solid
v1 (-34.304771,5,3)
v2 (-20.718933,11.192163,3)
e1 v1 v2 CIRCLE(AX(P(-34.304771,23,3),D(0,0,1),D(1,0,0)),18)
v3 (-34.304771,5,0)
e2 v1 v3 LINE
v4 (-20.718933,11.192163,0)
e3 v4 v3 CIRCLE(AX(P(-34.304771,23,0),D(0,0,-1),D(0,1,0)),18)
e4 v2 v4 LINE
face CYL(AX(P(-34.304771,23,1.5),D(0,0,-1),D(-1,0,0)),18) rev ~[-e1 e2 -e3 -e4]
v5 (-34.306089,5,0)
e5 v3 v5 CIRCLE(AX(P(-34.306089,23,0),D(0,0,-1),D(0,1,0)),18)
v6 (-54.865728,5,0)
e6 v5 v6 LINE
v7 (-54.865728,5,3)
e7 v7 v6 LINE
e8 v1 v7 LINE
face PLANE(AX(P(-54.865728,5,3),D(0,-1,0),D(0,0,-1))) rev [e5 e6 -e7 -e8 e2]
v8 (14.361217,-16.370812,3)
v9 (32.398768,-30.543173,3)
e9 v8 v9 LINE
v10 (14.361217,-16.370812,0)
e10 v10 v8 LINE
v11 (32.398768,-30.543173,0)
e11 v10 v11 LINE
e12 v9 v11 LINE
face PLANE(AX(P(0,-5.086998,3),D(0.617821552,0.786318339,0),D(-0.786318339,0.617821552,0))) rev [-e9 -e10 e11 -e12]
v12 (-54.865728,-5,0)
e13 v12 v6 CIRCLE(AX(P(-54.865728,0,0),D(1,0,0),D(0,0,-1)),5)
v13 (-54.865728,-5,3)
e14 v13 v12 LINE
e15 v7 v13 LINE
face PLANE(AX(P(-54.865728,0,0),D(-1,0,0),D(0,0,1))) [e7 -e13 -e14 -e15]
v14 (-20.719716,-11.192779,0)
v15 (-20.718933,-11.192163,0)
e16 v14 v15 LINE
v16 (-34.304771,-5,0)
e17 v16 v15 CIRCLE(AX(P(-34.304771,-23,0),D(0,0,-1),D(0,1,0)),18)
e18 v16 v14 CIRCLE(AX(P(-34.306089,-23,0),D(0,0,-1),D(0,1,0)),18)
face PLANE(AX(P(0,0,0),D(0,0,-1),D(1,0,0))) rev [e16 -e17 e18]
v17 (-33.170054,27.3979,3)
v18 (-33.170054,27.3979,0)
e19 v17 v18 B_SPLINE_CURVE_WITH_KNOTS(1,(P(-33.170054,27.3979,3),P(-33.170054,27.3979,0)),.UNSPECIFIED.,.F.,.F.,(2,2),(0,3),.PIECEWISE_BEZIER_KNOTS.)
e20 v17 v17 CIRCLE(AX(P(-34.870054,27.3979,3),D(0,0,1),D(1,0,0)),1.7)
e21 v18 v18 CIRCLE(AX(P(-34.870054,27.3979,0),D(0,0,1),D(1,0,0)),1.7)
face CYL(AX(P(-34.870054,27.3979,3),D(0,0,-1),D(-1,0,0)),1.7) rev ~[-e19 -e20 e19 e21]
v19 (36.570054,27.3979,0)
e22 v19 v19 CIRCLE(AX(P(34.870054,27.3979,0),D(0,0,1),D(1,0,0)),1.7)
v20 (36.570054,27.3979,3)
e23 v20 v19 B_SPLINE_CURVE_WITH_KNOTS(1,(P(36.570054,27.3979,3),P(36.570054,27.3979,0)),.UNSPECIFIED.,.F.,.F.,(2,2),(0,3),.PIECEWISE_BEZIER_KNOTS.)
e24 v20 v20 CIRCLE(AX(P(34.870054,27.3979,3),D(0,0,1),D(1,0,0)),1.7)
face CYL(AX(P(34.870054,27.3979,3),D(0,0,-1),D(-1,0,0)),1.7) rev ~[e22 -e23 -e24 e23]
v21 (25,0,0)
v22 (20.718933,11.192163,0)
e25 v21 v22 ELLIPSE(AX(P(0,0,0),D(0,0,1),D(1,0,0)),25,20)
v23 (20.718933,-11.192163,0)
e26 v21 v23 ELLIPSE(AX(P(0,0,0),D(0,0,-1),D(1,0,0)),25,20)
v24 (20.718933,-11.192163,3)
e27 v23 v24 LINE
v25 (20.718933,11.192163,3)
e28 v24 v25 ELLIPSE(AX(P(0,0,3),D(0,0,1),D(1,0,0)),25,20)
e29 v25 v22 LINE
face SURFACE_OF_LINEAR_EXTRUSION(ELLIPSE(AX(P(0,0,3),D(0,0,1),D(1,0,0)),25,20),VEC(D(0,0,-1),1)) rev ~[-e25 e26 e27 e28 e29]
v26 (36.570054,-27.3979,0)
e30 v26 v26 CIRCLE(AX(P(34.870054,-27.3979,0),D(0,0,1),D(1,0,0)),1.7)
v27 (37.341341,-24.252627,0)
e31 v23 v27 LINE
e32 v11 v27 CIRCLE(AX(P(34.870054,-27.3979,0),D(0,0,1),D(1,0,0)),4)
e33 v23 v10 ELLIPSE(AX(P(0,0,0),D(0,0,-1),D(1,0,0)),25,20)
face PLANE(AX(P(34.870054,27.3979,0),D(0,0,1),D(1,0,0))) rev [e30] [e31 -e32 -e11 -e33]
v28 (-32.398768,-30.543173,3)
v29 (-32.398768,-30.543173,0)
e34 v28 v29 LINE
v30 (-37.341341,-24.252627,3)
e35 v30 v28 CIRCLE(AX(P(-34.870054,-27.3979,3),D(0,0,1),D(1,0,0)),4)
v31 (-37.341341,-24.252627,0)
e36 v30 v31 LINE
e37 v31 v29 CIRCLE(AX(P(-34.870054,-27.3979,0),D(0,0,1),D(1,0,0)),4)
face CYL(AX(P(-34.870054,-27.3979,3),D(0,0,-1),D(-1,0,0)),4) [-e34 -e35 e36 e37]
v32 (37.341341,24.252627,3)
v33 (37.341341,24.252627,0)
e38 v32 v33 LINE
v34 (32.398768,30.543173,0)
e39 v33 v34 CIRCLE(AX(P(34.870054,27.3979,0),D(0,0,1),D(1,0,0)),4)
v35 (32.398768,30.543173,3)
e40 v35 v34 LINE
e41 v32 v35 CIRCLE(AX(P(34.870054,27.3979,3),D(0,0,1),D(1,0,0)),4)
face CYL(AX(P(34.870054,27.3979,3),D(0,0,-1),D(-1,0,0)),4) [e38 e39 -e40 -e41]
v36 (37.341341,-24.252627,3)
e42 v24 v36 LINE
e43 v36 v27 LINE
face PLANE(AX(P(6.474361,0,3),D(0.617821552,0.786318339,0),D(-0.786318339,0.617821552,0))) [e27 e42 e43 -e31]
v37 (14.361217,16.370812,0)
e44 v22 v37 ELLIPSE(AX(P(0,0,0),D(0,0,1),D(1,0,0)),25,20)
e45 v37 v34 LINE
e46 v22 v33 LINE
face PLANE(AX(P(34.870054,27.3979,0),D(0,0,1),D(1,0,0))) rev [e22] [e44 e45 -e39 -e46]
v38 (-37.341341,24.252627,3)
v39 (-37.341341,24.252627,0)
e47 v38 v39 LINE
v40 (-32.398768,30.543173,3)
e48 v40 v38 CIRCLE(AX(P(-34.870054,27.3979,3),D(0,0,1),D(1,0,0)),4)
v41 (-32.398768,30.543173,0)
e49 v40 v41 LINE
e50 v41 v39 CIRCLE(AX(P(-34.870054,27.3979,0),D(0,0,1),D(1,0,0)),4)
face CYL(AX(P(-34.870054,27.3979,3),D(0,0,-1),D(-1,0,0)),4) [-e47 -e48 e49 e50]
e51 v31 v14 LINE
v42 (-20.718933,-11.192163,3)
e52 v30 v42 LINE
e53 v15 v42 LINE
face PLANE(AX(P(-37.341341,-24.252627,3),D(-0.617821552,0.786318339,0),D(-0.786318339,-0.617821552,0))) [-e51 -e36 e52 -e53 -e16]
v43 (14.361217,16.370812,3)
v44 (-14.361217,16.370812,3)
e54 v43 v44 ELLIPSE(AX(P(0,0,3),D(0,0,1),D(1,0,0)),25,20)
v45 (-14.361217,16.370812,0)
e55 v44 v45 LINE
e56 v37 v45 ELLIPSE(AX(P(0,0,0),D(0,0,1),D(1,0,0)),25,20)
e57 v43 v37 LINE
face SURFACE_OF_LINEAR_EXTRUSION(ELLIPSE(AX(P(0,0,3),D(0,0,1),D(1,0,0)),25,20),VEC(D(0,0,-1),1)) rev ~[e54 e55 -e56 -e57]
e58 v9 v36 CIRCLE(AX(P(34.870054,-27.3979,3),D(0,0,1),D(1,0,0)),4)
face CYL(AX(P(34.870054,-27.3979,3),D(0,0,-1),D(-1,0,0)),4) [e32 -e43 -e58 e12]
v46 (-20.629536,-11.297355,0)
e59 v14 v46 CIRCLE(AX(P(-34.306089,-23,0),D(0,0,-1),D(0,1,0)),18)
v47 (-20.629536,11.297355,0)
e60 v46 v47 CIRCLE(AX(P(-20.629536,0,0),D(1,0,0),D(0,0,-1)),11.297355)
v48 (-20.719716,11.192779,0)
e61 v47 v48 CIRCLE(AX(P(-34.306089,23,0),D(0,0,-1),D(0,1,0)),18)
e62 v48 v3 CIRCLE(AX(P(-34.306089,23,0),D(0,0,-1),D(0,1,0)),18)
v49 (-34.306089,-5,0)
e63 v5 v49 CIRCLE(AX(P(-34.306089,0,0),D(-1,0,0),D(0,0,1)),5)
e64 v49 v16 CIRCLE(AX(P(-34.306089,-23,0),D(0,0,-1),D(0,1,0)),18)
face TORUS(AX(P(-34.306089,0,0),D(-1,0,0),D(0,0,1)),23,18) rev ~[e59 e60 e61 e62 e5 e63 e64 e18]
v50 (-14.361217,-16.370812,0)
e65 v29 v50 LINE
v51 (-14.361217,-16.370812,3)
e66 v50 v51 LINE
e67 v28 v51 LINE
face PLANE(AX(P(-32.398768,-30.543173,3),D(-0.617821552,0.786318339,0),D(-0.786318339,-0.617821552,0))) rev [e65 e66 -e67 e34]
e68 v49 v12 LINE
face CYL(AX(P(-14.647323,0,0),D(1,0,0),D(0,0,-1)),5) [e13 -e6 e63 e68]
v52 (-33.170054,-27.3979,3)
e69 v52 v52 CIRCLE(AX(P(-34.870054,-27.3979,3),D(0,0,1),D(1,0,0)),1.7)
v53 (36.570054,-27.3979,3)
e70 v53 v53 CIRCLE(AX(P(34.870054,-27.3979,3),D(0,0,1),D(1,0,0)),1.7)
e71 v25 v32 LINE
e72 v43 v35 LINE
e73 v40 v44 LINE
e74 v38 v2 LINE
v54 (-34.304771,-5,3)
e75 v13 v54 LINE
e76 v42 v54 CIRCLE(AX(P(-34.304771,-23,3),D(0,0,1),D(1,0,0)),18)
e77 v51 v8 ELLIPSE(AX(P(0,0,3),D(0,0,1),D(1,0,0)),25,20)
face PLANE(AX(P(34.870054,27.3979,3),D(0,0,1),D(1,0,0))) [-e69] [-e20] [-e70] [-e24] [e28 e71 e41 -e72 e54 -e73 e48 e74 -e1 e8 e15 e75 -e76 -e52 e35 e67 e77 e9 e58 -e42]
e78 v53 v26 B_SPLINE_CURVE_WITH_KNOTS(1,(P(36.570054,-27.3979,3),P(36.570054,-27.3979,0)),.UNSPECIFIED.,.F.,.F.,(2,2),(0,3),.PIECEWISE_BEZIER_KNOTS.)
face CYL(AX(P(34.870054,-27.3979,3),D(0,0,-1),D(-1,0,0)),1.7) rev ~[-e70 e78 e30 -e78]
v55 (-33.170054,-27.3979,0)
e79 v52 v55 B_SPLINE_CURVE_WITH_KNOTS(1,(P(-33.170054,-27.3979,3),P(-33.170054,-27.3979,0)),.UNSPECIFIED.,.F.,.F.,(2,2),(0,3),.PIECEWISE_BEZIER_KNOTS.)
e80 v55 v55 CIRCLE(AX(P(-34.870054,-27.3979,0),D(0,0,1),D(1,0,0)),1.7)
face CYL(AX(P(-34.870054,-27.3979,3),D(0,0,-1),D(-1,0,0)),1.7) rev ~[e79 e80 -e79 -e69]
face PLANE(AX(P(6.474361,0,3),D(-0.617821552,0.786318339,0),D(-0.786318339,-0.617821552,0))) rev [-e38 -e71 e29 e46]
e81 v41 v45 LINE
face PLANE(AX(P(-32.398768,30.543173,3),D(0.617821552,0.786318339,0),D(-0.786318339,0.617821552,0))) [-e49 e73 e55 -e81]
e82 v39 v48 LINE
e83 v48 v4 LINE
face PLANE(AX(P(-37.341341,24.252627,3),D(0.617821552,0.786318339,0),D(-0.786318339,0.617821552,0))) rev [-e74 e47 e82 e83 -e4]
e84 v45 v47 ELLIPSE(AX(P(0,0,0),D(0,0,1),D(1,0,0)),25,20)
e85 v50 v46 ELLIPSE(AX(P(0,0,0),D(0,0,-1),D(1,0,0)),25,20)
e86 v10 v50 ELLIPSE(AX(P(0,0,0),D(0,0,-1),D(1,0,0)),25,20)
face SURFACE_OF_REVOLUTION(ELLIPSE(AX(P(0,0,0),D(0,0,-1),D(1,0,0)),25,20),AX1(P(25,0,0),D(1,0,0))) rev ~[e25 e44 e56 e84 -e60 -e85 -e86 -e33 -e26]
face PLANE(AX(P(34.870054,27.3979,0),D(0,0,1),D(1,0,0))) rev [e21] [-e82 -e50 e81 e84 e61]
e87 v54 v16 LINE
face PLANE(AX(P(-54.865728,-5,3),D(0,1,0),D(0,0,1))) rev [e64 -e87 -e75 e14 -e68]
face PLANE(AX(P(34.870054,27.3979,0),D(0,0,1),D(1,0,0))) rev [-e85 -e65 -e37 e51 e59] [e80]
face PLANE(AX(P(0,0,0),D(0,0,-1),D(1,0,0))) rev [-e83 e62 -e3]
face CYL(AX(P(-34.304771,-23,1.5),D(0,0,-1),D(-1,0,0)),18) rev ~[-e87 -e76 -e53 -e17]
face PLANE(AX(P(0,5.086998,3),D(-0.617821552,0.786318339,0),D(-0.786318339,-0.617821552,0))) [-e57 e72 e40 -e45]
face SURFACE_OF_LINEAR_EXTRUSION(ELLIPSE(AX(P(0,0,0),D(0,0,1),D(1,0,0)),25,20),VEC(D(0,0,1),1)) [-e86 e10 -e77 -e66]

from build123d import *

# Parameters (mm, degrees)
R_VOLUTION2_ANGLE  = 180
R_VOLUTION4_START  = -54.865727699
R_VOLUTION4_DEPTH  = 30.659581785
CONG_1_R           = 18
ESQUISSE4_R        = 1.7
BOSS_EXTRU_3_DEPTH = 3
BOSS_EXTRU_4_DEPTH = 3
ESQUISSE6_RX       = 25
ESQUISSE6_RY       = 20
BOSS_EXTRU_5_DEPTH = 3
ESQUISSE8_W        = 41.684690815
ESQUISSE8_H        = 10
BOSS_EXTRU_6_DEPTH = 3
CONG_2_R           = 18
CONG_3_R           = 18


# Read off the part's stored shape, not the designer's step: Révolution4
with BuildPart() as part:
    # Esquisse1 → Révolution2 (revolve)
    with BuildSketch(Plane.XY):
        with BuildLine():
            Line((25, 0), (-25, 0))
            add(Edge.make_bspline(
                [(25, 0), (25, 20), (0, 20), (-25, 20), (-25, 0)],
                knots=[3.141592654, 3.141592654, 3.141592654, 4.71238898, 4.71238898, 6.283185307, 6.283185307, 6.283185307], degree=2, weights=[1, 0.707106781, 1, 0.707106781, 1]))
        make_face()
    revolve(axis=Axis((25, 0, 0), (-1, 0, 0)), revolution_arc=R_VOLUTION2_ANGLE)

    # Révolution4 outline → Révolution4 (add)
    with BuildSketch(Plane.YZ.offset(R_VOLUTION4_START)):
        with BuildLine():
            Line((5, 0), (-5, 0))
            ThreePointArc((-5, 0), (0, -5), (5, 0))
        make_face()
    extrude(amount=R_VOLUTION4_DEPTH)

    # Congé1
    cong_1_edges = [part.edges().sort_by_distance(p)[0] for p in [
        (-24.206145914, 0, -5),
    ]]
    fillet(cong_1_edges, radius=CONG_1_R)

    # Esquisse4 → Boss.-Extru.3 (add)
    with BuildSketch(Plane.XY):
        with BuildLine():
            Line((-32.398768241, 30.54317328), (0, 5.086998233))
            Line((0, 5.086998233), (32.398768241, 30.54317328))
            ThreePointArc((32.398768241, 30.54317328), (38.015327804, 29.869186132), (37.341340657, 24.252626569))
            Line((37.341340657, 24.252626569), (6.474361387, 0))
            Line((6.474361387, 0), (37.341340657, -24.252626569))
            ThreePointArc((37.341340657, -24.252626569), (38.015327804, -29.869186132), (32.398768241, -30.54317328))
            Line((32.398768241, -30.54317328), (0, -5.086998233))
            Line((0, -5.086998233), (-32.398768241, -30.54317328))
            ThreePointArc((-32.398768241, -30.54317328), (-38.015327804, -29.869186132), (-37.341340657, -24.252626569))
            Line((-37.341340657, -24.252626569), (-6.474361387, 0))
            Line((-6.474361387, 0), (-37.341340657, 24.252626569))
            ThreePointArc((-37.341340657, 24.252626569), (-38.015327804, 29.869186132), (-32.398768241, 30.54317328))
        make_face()
        with Locations((34.870054449, 27.397899924)):
            Circle(ESQUISSE4_R, mode=Mode.SUBTRACT)
        with Locations((34.870054449, -27.397899924)):
            Circle(ESQUISSE4_R, mode=Mode.SUBTRACT)
        with Locations((-34.870054449, 27.397899924)):
            Circle(ESQUISSE4_R, mode=Mode.SUBTRACT)
        with Locations((-34.870054449, -27.397899924)):
            Circle(ESQUISSE4_R, mode=Mode.SUBTRACT)
    extrude(amount=BOSS_EXTRU_3_DEPTH)

    # Esquisse1<2> → Boss.-Extru.4 (add)
    with BuildSketch(Plane.XY):
        with BuildLine():
            Line((25, 0), (-25, 0))
            add(Edge.make_bspline(
                [(25, 0), (25, 20), (0, 20), (-25, 20), (-25, 0)],
                knots=[3.141592654, 3.141592654, 3.141592654, 4.71238898, 4.71238898, 6.283185307, 6.283185307, 6.283185307], degree=2, weights=[1, 0.707106781, 1, 0.707106781, 1]))
        make_face()
    extrude(amount=BOSS_EXTRU_4_DEPTH)

    # Esquisse6 → Boss.-Extru.5 (add)
    with BuildSketch(Plane.XY.offset(3)):
        with Locations((0, 0)):
            Ellipse(ESQUISSE6_RX, ESQUISSE6_RY)
    extrude(amount=-BOSS_EXTRU_5_DEPTH)

    # Esquisse8 → Boss.-Extru.6 (add)
    with BuildSketch(Plane.XY):
        with Locations((-34.023382291, 0)):
            Rectangle(ESQUISSE8_W, ESQUISSE8_H)
    extrude(amount=BOSS_EXTRU_6_DEPTH)

    # Congé2
    # the kernel refuses this fillet: 18 mm, written as the material it adds along each edge
    with BuildSketch(Plane(origin=(-24.206145914, -5, 0), x_dir=(-1, 0, 0), z_dir=(0, 0, 1))) as cong_2_piece_1:
        with BuildLine():
            CenterArc((10.09862512, 18), CONG_2_R, 220.994829653, 49.005170347)
            Line((-3.487212913, 6.19216341), (-3.758929674, 5.956006679))
            ThreePointArc((-3.758929674, 5.956006679), (-1.755079895, 3.089571084), (-0.342598285, -0.110573121))
            Line((-0.342598285, -0.110573121), (0, -0.36))
            Line((0, -0.36), (10.09862512, -0.36))
            Line((10.09862512, -0.36), (10.09862512, 0))
        make_face()
    extrude(amount=3)

    # Congé3
    # the kernel refuses this fillet: 18 mm, written as the material it adds along each edge
    with BuildSketch(Plane(origin=(-24.206145914, 5, 3), x_dir=(-1, 0, 0), z_dir=(0, 0, -1))) as cong_3_piece_1:
        with BuildLine():
            CenterArc((10.09862512, 18), CONG_3_R, 220.994829653, 49.005170347)
            Line((-3.487212913, 6.19216341), (-3.758929674, 5.956006679))
            ThreePointArc((-3.758929674, 5.956006679), (-1.755079895, 3.089571084), (-0.342598285, -0.110573121))
            Line((-0.342598285, -0.110573121), (0, -0.36))
            Line((0, -0.36), (10.09862512, -0.36))
            Line((10.09862512, -0.36), (10.09862512, 0))
        make_face()
    extrude(amount=3)


solid = part.part
